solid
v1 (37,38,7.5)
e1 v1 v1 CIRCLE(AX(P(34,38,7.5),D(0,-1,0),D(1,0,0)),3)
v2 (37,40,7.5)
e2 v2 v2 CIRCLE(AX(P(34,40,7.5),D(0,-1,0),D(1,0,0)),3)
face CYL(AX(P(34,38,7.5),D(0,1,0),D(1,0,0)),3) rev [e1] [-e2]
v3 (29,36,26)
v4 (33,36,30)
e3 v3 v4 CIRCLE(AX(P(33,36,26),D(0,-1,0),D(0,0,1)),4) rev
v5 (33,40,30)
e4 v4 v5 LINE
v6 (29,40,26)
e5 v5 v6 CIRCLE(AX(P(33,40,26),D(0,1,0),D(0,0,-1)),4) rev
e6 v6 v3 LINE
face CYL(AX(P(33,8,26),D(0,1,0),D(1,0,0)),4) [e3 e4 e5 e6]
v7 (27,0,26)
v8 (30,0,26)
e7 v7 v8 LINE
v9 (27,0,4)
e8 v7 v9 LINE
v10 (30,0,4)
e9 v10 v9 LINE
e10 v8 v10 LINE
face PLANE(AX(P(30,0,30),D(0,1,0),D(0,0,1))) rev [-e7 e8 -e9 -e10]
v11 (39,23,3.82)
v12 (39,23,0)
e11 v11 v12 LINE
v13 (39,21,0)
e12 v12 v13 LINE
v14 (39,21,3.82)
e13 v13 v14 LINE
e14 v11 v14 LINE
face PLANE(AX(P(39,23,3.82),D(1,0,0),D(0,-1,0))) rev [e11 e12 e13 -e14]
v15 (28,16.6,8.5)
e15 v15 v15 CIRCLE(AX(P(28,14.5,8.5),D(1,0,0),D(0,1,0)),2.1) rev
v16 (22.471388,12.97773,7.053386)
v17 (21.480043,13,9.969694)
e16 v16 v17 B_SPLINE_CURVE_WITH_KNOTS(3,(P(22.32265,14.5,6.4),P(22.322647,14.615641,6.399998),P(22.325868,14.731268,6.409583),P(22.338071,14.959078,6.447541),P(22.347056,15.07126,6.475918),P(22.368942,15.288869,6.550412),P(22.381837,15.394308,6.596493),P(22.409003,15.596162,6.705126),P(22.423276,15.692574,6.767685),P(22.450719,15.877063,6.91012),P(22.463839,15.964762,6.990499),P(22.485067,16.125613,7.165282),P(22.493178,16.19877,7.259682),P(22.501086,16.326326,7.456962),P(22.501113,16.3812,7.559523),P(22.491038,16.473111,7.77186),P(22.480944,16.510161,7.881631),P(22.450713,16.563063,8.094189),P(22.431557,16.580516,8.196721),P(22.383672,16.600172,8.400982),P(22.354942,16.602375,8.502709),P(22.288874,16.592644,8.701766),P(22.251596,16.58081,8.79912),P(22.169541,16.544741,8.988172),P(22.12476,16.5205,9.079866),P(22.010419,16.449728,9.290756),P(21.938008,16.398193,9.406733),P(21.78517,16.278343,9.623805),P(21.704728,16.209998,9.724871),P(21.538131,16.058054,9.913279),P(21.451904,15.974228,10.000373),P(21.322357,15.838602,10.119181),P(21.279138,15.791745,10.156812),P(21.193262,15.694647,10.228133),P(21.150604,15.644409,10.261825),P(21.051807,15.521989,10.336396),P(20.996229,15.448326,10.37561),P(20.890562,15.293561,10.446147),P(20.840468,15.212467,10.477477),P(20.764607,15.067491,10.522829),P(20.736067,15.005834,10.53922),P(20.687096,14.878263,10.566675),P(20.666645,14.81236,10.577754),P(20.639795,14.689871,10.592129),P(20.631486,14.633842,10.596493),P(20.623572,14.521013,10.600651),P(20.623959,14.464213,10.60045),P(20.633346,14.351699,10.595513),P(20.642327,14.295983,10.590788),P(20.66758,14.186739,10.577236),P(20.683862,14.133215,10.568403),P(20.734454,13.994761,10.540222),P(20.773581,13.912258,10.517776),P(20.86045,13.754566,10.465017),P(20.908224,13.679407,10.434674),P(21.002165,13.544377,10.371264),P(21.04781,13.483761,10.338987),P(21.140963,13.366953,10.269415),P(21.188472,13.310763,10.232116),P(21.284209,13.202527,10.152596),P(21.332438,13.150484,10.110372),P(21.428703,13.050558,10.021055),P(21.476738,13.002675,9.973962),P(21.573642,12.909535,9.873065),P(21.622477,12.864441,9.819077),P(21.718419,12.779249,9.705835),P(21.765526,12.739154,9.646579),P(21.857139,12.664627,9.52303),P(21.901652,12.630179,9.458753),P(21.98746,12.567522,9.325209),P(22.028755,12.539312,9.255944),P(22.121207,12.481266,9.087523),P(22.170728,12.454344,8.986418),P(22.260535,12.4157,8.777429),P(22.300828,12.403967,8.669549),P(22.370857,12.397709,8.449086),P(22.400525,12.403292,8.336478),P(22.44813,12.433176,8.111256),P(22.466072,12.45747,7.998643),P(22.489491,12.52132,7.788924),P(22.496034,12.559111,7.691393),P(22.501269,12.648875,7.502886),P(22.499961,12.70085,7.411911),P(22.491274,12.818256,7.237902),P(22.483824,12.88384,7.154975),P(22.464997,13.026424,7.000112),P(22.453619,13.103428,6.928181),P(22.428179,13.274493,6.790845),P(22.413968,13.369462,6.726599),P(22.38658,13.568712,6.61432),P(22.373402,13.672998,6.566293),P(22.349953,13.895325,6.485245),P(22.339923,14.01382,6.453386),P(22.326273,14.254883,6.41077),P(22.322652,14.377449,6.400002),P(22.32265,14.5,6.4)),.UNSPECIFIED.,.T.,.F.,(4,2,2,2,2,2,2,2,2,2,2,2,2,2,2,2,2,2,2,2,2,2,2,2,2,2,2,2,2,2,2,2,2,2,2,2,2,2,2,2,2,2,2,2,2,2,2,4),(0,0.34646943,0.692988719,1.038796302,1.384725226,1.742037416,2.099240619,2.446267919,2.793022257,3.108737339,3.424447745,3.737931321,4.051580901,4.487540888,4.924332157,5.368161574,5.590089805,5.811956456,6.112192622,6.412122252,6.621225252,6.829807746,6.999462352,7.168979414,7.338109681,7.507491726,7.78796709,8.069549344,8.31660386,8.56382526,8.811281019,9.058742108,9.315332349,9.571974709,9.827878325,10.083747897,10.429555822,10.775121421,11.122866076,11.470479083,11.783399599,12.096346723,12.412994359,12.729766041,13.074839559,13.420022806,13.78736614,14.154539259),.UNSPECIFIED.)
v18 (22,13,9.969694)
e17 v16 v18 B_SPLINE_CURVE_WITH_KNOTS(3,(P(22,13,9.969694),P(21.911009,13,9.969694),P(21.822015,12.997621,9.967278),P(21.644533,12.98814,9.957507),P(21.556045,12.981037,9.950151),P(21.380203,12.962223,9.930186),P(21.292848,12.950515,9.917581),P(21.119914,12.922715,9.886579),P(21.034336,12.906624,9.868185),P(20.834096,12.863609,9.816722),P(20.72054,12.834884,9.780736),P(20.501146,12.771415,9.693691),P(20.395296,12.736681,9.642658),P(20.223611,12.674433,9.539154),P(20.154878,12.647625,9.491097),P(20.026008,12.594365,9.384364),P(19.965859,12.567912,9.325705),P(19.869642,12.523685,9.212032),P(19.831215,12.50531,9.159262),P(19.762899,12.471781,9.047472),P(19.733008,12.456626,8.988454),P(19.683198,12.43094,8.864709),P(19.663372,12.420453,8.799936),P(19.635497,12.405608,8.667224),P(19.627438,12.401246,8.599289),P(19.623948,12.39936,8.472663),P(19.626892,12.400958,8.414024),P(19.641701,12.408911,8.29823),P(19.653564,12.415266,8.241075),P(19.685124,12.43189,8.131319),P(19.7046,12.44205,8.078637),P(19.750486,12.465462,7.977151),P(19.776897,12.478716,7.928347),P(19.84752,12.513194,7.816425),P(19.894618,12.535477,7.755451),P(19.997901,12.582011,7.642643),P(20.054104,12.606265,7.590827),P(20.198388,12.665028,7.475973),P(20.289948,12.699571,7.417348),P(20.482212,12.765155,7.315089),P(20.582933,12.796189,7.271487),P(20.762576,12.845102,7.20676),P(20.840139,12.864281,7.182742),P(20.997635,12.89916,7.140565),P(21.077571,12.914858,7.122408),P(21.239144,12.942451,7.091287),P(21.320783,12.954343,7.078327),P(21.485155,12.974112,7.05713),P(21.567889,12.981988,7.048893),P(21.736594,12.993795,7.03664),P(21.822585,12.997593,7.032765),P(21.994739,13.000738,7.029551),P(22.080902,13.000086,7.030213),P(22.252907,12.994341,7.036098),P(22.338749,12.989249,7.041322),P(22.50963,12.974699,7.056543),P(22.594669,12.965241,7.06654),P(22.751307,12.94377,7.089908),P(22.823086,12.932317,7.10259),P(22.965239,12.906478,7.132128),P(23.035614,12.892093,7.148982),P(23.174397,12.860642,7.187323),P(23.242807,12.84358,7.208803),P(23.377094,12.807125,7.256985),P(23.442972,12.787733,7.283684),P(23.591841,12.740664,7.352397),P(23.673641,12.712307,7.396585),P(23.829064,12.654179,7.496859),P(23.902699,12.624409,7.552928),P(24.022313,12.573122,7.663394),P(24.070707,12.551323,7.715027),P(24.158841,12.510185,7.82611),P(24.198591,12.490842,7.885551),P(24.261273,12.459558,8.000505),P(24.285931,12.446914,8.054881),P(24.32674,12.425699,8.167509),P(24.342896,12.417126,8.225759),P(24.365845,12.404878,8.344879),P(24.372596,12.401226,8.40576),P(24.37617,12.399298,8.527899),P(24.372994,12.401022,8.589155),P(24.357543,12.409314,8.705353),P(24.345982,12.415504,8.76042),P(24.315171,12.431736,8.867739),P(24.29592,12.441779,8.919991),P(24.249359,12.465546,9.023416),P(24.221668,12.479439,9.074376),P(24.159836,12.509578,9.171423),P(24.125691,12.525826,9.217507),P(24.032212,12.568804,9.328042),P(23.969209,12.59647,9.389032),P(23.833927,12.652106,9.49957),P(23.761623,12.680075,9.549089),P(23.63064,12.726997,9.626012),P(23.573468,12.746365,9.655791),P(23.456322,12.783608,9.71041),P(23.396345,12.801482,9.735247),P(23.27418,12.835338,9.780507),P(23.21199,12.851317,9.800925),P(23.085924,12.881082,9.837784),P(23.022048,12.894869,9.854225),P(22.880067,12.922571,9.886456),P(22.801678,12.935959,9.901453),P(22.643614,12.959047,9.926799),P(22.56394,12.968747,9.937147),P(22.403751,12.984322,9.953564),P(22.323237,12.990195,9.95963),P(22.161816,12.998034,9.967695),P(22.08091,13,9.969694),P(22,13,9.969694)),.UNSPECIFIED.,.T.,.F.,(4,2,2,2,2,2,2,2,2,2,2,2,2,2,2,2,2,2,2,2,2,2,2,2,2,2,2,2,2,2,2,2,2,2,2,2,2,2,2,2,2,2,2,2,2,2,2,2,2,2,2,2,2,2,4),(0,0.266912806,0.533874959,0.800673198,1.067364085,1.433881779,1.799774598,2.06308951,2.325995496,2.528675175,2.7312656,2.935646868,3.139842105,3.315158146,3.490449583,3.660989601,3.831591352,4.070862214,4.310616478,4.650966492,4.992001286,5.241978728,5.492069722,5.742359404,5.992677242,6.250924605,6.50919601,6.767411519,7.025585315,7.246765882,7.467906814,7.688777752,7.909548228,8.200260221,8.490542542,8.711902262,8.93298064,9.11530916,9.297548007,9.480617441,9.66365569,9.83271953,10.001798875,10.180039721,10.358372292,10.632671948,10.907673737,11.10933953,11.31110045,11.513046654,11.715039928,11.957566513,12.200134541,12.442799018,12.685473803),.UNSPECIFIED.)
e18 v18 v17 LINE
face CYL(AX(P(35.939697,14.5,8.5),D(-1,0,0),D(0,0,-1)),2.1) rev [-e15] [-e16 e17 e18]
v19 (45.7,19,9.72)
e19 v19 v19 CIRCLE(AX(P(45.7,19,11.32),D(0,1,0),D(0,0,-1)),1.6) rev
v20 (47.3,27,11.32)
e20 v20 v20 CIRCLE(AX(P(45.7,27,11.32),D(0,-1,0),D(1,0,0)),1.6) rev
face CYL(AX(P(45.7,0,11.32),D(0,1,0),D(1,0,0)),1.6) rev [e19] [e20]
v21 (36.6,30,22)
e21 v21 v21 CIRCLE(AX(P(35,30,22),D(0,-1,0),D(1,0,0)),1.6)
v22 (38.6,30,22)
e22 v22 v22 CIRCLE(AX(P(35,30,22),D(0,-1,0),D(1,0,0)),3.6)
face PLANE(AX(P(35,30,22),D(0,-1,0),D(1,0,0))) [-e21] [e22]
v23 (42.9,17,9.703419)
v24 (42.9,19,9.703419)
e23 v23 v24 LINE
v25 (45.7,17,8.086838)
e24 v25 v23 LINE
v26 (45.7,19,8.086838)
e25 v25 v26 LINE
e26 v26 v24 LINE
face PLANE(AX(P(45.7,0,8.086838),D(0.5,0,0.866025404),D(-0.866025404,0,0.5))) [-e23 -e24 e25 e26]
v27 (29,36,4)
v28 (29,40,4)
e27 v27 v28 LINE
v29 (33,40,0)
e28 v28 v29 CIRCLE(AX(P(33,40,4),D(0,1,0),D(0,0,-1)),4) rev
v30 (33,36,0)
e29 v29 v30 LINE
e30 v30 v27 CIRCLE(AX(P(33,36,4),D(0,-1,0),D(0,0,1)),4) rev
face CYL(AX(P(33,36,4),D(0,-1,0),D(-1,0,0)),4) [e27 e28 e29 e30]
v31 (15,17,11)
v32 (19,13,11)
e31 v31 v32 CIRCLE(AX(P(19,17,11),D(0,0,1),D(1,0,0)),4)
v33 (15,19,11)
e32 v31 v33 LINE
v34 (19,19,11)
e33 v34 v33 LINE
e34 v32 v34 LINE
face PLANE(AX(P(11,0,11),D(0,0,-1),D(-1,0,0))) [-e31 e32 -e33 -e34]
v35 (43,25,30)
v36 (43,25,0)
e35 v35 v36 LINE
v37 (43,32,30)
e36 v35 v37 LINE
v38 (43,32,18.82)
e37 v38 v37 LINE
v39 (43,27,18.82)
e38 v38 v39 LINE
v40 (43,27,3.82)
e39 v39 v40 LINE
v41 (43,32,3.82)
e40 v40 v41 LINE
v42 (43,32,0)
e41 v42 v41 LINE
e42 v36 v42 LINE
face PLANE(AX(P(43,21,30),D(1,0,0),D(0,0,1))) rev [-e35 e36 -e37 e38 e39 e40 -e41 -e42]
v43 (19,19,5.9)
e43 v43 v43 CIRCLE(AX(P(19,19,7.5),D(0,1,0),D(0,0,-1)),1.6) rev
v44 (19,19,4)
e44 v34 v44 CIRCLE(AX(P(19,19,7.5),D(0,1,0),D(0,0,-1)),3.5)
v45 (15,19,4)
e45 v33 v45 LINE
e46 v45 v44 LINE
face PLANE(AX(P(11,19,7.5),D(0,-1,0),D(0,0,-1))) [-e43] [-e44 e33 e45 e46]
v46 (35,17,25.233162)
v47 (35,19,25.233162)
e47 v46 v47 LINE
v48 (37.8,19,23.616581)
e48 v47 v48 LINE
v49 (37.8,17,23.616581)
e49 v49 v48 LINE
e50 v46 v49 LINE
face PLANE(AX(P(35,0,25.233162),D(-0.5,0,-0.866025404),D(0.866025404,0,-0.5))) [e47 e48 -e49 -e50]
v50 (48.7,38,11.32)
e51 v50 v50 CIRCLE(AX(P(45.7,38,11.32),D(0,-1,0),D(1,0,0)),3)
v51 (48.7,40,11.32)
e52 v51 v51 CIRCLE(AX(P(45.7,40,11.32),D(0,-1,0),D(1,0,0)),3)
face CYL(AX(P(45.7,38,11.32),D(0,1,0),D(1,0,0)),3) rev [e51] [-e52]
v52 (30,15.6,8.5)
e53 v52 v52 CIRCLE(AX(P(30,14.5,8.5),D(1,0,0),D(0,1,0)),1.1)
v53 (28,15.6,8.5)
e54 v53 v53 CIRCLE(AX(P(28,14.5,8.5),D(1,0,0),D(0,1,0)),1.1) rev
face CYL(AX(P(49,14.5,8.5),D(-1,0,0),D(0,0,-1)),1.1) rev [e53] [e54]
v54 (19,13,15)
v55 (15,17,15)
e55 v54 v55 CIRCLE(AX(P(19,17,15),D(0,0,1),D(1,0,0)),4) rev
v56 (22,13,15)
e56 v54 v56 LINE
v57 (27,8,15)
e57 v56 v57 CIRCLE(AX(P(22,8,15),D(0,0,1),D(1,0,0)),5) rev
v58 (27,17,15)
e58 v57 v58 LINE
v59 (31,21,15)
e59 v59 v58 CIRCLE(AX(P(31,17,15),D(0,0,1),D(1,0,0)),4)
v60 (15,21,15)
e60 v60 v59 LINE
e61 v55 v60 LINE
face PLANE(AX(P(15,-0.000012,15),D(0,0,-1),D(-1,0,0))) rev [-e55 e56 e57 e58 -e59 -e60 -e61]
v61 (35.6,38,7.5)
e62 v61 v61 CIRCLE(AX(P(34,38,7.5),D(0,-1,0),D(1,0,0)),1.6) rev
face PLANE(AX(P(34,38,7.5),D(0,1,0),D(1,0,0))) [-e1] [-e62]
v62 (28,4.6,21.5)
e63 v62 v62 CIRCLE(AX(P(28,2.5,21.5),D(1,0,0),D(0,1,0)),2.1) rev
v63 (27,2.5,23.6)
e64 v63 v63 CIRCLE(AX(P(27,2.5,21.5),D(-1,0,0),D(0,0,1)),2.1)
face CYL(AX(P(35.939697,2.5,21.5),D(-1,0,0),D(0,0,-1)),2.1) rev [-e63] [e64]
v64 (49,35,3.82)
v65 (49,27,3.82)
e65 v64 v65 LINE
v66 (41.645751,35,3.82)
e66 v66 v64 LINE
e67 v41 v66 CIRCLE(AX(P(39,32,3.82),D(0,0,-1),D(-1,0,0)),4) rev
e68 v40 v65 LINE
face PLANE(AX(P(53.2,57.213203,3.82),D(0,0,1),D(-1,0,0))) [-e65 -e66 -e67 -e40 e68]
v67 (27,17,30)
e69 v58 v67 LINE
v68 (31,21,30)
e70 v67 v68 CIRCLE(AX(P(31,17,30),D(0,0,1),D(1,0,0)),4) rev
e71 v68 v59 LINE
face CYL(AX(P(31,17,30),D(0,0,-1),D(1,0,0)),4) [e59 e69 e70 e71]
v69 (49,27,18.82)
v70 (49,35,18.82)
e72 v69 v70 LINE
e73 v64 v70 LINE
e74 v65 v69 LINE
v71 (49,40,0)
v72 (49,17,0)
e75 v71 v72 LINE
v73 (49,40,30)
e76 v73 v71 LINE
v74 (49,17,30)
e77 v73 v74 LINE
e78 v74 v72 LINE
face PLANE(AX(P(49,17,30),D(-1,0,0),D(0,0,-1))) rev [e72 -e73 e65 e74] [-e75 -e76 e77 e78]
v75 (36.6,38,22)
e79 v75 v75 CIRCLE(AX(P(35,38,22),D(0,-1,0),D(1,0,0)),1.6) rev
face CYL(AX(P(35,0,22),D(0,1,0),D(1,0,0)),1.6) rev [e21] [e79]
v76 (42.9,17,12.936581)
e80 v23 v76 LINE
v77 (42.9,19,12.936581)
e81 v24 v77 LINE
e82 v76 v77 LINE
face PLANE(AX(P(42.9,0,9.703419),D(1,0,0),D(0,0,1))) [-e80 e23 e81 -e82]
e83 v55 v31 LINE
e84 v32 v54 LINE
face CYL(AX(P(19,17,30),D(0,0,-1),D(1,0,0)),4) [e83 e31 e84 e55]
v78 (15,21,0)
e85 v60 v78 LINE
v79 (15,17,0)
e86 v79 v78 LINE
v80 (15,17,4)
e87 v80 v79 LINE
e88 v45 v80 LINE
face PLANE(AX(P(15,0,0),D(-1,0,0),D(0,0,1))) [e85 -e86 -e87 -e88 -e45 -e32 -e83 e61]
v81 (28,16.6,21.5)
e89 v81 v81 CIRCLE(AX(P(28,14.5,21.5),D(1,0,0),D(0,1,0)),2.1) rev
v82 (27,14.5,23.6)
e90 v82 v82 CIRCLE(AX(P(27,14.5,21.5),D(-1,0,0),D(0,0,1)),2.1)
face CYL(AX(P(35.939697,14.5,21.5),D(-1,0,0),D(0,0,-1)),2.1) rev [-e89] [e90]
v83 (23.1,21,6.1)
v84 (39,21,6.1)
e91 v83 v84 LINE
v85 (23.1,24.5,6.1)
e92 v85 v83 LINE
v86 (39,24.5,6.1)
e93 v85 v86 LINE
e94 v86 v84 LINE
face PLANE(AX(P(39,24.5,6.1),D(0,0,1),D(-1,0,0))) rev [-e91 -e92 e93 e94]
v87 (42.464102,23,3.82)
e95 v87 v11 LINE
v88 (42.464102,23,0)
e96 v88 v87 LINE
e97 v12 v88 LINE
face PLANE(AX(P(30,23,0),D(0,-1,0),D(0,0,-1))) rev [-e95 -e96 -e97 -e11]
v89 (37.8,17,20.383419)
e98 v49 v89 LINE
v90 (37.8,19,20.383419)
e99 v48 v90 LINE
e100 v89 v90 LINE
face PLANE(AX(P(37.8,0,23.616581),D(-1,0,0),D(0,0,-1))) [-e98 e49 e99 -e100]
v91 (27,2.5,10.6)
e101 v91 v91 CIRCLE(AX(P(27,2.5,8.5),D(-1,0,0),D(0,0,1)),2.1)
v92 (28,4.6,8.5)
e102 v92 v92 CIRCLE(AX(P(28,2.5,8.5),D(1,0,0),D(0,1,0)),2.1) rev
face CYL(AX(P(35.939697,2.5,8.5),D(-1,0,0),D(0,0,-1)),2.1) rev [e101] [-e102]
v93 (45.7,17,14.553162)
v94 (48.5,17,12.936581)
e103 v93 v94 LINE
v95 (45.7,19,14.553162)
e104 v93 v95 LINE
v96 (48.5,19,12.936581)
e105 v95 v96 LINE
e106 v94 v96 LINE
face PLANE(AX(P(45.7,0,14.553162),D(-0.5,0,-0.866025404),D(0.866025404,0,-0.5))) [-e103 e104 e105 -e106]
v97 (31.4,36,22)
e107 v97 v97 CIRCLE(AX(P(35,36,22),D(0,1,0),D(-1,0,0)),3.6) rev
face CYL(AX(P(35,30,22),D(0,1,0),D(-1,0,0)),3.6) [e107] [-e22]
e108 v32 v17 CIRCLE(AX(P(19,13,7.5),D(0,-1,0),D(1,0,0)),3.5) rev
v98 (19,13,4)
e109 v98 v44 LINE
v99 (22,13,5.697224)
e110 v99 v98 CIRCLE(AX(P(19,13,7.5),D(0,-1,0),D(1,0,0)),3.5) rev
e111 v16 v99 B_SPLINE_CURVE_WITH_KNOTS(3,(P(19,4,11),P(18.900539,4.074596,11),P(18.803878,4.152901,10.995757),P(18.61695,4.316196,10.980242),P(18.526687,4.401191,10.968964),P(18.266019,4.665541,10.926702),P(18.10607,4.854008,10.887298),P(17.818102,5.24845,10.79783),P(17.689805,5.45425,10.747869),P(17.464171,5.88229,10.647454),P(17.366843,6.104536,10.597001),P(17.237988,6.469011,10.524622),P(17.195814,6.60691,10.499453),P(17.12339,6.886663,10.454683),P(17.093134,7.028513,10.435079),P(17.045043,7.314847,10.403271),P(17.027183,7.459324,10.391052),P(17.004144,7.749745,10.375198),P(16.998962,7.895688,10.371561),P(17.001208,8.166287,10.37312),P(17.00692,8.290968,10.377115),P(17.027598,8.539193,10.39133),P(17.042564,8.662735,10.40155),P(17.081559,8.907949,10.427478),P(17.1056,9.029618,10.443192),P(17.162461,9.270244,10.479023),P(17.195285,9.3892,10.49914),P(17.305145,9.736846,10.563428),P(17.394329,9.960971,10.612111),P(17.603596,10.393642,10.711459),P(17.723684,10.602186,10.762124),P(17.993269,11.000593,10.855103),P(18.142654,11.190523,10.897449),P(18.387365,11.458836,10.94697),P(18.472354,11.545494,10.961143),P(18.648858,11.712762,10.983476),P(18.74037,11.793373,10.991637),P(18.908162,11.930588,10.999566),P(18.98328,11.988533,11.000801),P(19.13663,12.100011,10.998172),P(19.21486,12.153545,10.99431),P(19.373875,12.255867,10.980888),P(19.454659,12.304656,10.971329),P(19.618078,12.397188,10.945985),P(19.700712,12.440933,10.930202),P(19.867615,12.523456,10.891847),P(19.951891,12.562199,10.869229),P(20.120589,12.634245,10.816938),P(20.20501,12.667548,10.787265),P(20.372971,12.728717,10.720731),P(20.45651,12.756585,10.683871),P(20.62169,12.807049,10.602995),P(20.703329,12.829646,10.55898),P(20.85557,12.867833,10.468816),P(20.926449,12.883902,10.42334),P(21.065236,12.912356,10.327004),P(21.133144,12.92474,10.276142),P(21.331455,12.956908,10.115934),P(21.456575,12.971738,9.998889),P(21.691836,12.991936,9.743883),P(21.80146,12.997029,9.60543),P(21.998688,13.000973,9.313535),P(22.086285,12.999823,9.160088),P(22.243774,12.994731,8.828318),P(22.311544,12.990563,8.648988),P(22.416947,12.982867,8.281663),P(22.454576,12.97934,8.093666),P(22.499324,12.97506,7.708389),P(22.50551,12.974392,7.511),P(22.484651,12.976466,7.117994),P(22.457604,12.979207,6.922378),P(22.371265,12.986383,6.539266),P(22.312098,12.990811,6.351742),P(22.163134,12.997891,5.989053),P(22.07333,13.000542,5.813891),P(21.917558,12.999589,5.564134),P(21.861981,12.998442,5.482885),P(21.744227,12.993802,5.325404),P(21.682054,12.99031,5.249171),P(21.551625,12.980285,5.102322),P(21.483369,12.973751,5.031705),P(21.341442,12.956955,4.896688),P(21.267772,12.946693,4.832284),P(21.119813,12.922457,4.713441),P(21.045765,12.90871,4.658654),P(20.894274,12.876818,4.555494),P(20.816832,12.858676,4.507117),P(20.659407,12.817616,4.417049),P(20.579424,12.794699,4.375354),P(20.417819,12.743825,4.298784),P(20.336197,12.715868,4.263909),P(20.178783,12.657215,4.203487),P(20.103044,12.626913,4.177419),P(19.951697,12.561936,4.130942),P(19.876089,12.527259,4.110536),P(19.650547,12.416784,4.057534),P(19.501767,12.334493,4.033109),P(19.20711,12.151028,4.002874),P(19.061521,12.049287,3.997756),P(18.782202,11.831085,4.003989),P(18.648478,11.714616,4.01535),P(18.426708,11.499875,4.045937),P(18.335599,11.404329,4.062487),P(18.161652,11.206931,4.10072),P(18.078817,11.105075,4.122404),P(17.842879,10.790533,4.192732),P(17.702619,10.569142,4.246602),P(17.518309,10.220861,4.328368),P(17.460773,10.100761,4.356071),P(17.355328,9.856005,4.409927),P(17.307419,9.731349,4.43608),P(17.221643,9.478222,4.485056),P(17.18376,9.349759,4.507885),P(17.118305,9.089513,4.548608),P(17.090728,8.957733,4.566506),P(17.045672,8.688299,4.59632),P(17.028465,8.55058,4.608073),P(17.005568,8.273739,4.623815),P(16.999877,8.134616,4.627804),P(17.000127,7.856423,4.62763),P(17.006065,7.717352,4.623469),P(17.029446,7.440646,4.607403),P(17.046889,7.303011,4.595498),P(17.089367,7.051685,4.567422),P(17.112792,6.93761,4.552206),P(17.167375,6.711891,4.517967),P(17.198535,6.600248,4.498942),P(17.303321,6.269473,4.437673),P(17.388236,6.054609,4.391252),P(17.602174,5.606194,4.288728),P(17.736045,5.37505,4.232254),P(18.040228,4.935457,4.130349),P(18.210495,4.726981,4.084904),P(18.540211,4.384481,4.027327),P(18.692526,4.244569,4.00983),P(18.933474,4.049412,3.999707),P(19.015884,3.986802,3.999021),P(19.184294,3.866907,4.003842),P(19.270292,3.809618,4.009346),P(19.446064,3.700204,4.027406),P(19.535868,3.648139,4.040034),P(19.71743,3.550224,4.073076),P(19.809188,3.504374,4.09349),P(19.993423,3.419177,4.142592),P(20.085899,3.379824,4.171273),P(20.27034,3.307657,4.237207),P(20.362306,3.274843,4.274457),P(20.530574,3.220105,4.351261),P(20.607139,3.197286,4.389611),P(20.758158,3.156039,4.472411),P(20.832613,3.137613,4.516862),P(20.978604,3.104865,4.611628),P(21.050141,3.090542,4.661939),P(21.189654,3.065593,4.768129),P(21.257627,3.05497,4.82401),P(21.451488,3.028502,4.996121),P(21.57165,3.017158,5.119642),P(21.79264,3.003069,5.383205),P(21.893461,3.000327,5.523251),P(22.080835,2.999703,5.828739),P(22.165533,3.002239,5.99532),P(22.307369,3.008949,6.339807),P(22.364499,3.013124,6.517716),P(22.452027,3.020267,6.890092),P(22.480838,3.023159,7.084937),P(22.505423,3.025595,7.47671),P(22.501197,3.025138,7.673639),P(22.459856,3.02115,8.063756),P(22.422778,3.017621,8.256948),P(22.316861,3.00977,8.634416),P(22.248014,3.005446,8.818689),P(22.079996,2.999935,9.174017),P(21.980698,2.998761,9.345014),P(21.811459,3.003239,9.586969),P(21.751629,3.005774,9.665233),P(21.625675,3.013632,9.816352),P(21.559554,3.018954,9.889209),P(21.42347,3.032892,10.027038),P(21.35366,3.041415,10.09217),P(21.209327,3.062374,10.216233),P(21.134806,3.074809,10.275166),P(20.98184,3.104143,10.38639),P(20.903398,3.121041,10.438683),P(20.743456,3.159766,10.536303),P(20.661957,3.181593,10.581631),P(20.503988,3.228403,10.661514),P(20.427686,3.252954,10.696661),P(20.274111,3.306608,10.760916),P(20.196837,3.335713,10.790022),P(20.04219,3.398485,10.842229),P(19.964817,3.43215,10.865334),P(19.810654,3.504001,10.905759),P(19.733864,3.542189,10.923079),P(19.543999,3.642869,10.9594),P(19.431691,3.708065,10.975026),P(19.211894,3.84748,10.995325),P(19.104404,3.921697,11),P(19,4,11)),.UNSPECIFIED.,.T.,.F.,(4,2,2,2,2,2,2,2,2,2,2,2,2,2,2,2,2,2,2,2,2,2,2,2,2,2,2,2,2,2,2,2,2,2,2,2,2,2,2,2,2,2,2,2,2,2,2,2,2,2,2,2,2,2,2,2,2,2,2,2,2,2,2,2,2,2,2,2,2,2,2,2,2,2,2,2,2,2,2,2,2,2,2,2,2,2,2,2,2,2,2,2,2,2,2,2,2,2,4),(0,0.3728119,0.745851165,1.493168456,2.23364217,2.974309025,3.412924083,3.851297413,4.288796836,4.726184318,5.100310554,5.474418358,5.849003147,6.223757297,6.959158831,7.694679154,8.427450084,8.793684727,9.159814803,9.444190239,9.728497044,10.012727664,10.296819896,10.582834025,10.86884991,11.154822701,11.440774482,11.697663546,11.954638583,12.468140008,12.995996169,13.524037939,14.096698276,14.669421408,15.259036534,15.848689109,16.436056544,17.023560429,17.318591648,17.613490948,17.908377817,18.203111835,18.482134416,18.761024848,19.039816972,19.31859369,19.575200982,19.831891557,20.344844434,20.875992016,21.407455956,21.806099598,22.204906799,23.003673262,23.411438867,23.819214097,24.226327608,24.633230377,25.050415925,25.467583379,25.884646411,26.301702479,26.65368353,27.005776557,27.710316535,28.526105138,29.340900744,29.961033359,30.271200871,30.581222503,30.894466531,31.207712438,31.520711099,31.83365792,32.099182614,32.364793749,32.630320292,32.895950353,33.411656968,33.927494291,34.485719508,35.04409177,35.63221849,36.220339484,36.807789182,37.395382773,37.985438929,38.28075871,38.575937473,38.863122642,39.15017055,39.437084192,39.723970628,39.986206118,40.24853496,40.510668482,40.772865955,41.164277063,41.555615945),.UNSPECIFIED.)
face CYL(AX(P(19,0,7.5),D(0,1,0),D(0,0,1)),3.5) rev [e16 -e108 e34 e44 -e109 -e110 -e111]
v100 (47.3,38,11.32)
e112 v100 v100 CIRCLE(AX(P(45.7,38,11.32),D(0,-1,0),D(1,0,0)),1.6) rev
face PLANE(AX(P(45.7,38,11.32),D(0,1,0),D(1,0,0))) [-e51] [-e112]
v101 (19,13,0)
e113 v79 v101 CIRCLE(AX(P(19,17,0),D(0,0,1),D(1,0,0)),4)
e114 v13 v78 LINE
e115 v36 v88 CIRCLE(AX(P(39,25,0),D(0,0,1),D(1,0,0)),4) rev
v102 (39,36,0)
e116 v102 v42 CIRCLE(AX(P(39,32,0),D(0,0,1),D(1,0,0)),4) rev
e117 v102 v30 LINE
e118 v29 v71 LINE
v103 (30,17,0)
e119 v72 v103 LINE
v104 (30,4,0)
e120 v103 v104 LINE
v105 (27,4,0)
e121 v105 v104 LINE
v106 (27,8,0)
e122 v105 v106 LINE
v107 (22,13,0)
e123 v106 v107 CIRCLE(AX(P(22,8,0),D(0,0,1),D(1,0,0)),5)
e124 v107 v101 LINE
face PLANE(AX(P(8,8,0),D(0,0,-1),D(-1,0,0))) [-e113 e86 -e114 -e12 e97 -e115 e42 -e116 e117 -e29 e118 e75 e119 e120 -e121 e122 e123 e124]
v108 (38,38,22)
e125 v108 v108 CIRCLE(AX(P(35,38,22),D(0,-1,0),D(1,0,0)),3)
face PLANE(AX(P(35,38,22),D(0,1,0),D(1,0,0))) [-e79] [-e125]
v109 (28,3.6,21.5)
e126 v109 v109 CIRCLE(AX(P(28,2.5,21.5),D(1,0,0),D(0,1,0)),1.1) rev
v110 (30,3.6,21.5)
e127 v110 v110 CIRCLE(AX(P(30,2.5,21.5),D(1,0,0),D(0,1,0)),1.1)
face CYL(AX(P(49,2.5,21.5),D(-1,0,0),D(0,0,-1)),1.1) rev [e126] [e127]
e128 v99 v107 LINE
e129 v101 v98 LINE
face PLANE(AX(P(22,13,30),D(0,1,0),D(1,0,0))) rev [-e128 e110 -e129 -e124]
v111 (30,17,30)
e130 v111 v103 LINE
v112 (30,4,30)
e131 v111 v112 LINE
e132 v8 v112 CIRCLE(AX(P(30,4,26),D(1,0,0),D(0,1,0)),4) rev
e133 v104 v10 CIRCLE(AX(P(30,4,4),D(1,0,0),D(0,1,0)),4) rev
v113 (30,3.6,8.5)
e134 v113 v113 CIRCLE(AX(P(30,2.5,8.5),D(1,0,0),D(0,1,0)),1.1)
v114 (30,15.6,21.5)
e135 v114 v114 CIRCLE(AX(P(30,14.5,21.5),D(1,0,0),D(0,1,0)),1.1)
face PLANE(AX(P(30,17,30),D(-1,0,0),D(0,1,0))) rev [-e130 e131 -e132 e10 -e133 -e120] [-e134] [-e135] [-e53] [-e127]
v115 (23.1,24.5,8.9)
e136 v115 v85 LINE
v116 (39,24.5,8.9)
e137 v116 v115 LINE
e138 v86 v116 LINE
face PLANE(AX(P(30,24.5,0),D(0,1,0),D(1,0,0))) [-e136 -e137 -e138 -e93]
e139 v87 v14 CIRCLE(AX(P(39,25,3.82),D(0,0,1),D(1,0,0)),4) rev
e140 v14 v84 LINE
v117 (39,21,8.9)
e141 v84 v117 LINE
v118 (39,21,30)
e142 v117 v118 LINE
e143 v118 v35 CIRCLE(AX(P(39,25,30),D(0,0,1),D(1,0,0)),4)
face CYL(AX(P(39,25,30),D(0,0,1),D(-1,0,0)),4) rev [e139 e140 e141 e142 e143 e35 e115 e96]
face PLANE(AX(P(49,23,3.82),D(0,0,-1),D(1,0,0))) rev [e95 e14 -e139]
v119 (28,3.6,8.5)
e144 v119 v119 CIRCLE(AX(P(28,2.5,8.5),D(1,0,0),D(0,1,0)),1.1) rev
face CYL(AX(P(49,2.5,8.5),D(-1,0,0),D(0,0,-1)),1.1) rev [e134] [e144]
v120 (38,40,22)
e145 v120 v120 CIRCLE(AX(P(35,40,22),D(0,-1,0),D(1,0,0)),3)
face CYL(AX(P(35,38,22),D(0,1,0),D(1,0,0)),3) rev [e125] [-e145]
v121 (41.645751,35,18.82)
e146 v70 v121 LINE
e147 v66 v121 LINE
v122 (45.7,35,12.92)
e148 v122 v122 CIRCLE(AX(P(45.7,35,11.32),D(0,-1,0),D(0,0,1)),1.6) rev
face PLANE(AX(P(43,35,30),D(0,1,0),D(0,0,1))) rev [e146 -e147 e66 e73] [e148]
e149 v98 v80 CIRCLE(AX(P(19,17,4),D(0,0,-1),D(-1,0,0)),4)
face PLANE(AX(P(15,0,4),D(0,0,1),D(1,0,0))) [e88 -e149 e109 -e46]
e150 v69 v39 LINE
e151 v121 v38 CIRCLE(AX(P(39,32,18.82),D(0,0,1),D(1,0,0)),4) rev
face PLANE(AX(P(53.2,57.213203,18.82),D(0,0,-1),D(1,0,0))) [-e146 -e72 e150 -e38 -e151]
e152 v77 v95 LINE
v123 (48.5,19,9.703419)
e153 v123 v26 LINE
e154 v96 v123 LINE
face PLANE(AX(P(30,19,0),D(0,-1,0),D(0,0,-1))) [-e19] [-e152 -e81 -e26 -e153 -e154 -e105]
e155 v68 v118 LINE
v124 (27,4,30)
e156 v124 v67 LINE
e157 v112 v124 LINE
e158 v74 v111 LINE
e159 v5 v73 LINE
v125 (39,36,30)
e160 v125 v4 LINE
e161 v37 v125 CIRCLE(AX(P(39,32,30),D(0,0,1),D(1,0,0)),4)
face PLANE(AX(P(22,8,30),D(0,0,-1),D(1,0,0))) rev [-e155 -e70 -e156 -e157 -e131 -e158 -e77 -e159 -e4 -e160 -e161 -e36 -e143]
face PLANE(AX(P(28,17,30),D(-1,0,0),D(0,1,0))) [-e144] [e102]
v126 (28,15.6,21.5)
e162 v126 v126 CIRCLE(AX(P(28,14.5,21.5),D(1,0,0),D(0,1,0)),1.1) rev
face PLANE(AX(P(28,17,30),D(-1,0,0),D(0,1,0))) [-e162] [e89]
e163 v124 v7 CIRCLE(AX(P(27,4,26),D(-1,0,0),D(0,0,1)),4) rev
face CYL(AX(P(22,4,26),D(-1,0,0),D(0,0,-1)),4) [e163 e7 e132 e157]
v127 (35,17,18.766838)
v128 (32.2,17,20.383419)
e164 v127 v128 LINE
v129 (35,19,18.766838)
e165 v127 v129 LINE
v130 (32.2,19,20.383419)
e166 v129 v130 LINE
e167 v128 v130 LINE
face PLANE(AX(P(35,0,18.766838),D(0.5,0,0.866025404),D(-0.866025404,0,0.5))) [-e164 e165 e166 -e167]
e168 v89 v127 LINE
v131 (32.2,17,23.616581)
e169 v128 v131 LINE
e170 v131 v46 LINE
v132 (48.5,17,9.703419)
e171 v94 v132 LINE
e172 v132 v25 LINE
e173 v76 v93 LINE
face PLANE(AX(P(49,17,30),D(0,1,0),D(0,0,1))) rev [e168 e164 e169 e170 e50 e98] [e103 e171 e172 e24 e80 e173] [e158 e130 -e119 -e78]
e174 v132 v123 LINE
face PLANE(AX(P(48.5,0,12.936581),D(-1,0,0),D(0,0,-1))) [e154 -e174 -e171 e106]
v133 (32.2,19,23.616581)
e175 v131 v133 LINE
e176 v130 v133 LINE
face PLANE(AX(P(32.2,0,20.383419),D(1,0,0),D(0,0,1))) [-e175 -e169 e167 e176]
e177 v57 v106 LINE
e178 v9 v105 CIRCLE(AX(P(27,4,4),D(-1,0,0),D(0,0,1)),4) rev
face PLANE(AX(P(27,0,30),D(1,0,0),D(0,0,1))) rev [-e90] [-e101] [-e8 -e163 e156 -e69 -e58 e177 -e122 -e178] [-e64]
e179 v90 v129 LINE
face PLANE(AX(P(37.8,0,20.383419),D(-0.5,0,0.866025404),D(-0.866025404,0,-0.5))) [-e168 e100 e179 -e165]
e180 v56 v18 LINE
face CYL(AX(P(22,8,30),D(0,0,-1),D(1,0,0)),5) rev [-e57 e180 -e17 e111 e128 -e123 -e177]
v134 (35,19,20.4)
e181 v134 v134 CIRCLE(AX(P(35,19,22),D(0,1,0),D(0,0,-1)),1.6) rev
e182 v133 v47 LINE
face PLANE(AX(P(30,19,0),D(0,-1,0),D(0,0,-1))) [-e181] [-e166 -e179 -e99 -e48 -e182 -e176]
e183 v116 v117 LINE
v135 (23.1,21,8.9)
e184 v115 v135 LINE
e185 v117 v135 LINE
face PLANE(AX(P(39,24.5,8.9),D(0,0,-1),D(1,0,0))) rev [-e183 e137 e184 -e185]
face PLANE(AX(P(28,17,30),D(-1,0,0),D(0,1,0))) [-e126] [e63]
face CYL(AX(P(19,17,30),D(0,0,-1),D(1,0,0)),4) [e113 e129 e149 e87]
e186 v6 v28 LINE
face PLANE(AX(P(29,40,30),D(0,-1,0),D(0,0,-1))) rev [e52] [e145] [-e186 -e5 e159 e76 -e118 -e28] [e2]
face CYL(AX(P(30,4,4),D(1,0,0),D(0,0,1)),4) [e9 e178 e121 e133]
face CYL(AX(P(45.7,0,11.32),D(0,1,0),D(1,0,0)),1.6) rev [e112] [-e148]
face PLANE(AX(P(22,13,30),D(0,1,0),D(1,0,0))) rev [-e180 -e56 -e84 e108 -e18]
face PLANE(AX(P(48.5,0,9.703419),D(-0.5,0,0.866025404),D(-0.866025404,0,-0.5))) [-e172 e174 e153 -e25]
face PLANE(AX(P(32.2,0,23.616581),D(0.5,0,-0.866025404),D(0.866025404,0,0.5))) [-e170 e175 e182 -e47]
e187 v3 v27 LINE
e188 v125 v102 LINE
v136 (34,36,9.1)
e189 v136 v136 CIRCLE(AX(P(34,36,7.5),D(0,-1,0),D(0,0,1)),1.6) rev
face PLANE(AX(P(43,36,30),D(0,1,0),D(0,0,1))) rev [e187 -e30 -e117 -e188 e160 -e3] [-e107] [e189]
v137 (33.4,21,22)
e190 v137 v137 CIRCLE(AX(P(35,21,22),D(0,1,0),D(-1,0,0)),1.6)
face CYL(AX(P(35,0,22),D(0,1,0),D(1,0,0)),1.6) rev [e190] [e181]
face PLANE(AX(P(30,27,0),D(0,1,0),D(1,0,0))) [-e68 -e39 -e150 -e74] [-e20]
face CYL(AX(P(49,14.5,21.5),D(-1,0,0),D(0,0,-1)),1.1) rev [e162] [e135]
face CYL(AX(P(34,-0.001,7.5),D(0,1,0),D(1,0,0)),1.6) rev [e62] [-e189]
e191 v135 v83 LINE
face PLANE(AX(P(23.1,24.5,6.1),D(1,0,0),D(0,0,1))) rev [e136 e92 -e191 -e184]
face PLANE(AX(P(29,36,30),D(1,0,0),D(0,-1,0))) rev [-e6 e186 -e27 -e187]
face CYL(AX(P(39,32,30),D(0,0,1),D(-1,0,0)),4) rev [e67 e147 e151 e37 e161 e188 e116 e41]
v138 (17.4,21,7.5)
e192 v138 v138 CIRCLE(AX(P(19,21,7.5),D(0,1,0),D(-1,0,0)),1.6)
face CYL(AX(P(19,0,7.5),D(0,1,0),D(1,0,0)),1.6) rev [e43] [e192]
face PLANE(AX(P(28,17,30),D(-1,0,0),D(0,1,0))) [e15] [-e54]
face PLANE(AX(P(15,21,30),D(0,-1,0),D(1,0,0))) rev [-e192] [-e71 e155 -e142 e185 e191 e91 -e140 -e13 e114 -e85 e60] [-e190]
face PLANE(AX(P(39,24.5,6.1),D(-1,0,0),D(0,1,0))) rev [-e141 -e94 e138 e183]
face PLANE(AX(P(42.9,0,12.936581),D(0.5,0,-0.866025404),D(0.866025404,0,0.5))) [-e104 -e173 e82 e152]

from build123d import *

# Parameters (mm, degrees)
RESSALTO_EXTRUS_O1_DEPTH    = 30
CORTE_EXTRUS_O1_DEPTH       = 54.488316481
CORTE_EXTRUS_O1_DEPTH_BACK  = 54.488316481
ESBO_O3_R                   = 1.1
CORTE_EXTRUS_O6_DEPTH       = 54.488316481
CORTE_EXTRUS_O6_DEPTH_BACK  = 54.488316481
ESBO_O4_W                   = 12
ESBO_O4_H                   = 15
ESBO_O5_R                   = 1.6
CORTE_EXTRUS_O7_DEPTH       = 54.488316481
CORTE_EXTRUS_O9_START       = 6
ESBO_O7_W                   = 15
ESBO_O7_H                   = 15
CORTE_EXTRUS_O9_DEPTH       = 8
CORTE_EXTRUS_O11_REACH      = 55.488
ESBO_O9_R                   = 1.6
ESBO_O8_R                   = 3
CORTE_EXTRUS_O10_DEPTH      = 2
CORTE_EXTRUS_O14_DEPTH      = 43.308391603
CORTE_EXTRUS_O14_DEPTH_BACK = 2
CORTE_EXTRUS_O16_DEPTH      = 55.626001135
CORTE_EXTRUS_O16_DEPTH_BACK = 1
ESBO_O15_R                  = 2.1
FILETE1_R                   = 4
ESBO_O16_W                  = 10
ESBO_O16_H                  = 3.82
RESSALTO_EXTRUS_O2_DEPTH    = 2
ESBO_O17_W                  = 15.9
ESBO_O17_H                  = 2.8
RESSALTO_EXTRUS_O3_DEPTH    = 3.5
ESBO_O18_W                  = 52.248887689
ESBO_O18_H                  = 54.313207189
CORTE_EXTRUS_O17_DEPTH      = 34
ESBO_O19_R                  = 3.6
ESBO_O19_R_2                = 1.6
RESSALTO_EXTRUS_O4_DEPTH    = 6


with BuildPart() as part:
    # Esboço1 → Ressalto-extrusão1 (new body)
    with BuildSketch(Plane.XY):
        with BuildLine():
            Line((0, 0), (3, 0))
            Line((3, 0), (3, 8))
            ThreePointArc((3, 8), (4.464466094, 11.535533906), (8, 13))
            Line((8, 13), (15, 13))
            Line((15, 13), (15, 21))
            Line((15, 21), (-13, 21))
            Line((-13, 21), (-13, 36))
            Line((-13, 36), (1, 36))
            Line((1, 36), (1, 40))
            Line((1, 40), (-19, 40))
            Line((-19, 40), (-19, 17))
            Line((-19, 17), (0, 17))
            Line((0, 17), (0, 0))
        make_face()
    extrude(amount=RESSALTO_EXTRUS_O1_DEPTH)

    # Esboço3 → Corte-extrusão1 (cut, two sides: drawn at the far end of the back side and taken through both)
    with BuildSketch(Plane(origin=(0, 0, 0), x_dir=(0, 0, -1), z_dir=(1, 0, 0)).offset(-CORTE_EXTRUS_O1_DEPTH_BACK)):
        with Locations((-8.5, 14.5)):
            Circle(ESBO_O3_R)
        with Locations(Location((-21.5, 14.5, 0), (0, 0, 90))):
            Circle(ESBO_O3_R)
        with Locations(Location((-8.5, 2.5, 0), (0, 0, 90))):
            Circle(ESBO_O3_R)
        with Locations(Location((-21.5, 2.5, 0), (0, 0, 90))):
            Circle(ESBO_O3_R)
    extrude(amount=CORTE_EXTRUS_O1_DEPTH + CORTE_EXTRUS_O1_DEPTH_BACK, mode=Mode.SUBTRACT)

    # Esboço4 → Corte-extrusão6 (cut, two sides: drawn at the far end of the back side and taken through both)
    with BuildSketch(Plane(origin=(0, 0, 0), x_dir=(1, 0, 0), z_dir=(0, 1, 0)).offset(-CORTE_EXTRUS_O6_DEPTH_BACK)):
        with Locations((9, -22.5)):
            Rectangle(ESBO_O4_W, ESBO_O4_H)
    extrude(amount=CORTE_EXTRUS_O6_DEPTH + CORTE_EXTRUS_O6_DEPTH_BACK, mode=Mode.SUBTRACT)

    # Esboço5 → Corte-extrusão7 (cut, through all)
    with BuildSketch(Plane(origin=(0, 40, 0), x_dir=(1, 0, 0), z_dir=(0, 1, 0))):
        with Locations(Location((-5, -22, 0), (0, 0, 270))):
            Circle(ESBO_O5_R)
        with Locations(Location((-15.7, -11.32, 0), (0, 0, 180))):
            Circle(ESBO_O5_R)
        with Locations(Location((11, -7.5, 0), (0, 0, 180))):
            Circle(ESBO_O5_R)
    extrude(amount=-CORTE_EXTRUS_O7_DEPTH, mode=Mode.SUBTRACT)

    # Esboço7 → Corte-extrusão9 (cut)
    with BuildSketch(Plane(origin=(0, 21, 0), x_dir=(1, 0, 0), z_dir=(0, 1, 0)).offset(CORTE_EXTRUS_O9_START)):
        with Locations((-15.7, -11.32)):
            Rectangle(ESBO_O7_W, ESBO_O7_H)
    extrude(amount=CORTE_EXTRUS_O9_DEPTH, mode=Mode.SUBTRACT)

    # Esboço9 → Corte-extrusão11 (cut, up to next)
    with BuildSketch(Plane(origin=(0, 40, 0), x_dir=(1, 0, 0), z_dir=(0, 1, 0)), mode=Mode.PRIVATE) as corte_extrus_o11_sk1:
        with Locations(Location((-4, -7.5, 0), (0, 0, 180))):
            Circle(ESBO_O9_R)
    corte_extrus_o11_tool1 = extrude(corte_extrus_o11_sk1.sketch, amount=-CORTE_EXTRUS_O11_REACH, mode=Mode.PRIVATE) & part.part
    add(corte_extrus_o11_tool1.solids().sort_by_distance((-4, 40, 7.5))[0], mode=Mode.SUBTRACT)

    # Esboço8 → Corte-extrusão10 (cut)
    with BuildSketch(Plane(origin=(0, 40, 0), x_dir=(1, 0, 0), z_dir=(0, 1, 0))):
        with Locations(Location((-15.7, -11.32, 0), (0, 0, 180))):
            Circle(ESBO_O8_R)
        with Locations(Location((-5, -22, 0), (0, 0, 180))):
            Circle(ESBO_O8_R)
        with Locations(Location((-4, -7.5, 0), (0, 0, 180))):
            Circle(ESBO_O8_R)
    extrude(amount=-CORTE_EXTRUS_O10_DEPTH, mode=Mode.SUBTRACT)

    # Esboço14 → Corte-extrusão14 (cut, two sides: drawn at the far end of the back side and taken through both)
    with BuildSketch(Plane.XZ.offset(-17).offset(-CORTE_EXTRUS_O14_DEPTH_BACK)):
        with BuildLine():
            Line((11, 11), (15, 11))
            Line((15, 11), (15, 4))
            Line((15, 4), (11, 4))
            ThreePointArc((11, 4), (7.5, 7.5), (11, 11))
        make_face()
        Polygon((-5, 25.233161507), (-7.8, 23.616580754), (-7.8, 20.383419246), (-5, 18.766838493), (-2.2, 20.383419246), (-2.2, 23.616580754), align=None)
        Polygon((-15.7, 14.553161507), (-18.5, 12.936580754), (-18.5, 9.703419246), (-15.7, 8.086838493), (-12.9, 9.703419246), (-12.9, 12.936580754), align=None)
    extrude(amount=CORTE_EXTRUS_O14_DEPTH + CORTE_EXTRUS_O14_DEPTH_BACK, mode=Mode.SUBTRACT)

    # Esboço15 → Corte-extrusão16 (cut, two sides: drawn at the far end of the back side and taken through both)
    with BuildSketch(Plane(origin=(3, 0, 0), x_dir=(0, 0, -1), z_dir=(1, 0, 0)).offset(-CORTE_EXTRUS_O16_DEPTH_BACK)):
        with Locations(Location((-21.5, 14.5, 0), (0, 0, 90))):
            Circle(ESBO_O15_R)
        with Locations(Location((-8.5, 14.5, 0), (0, 0, 313.540252108))):
            Circle(ESBO_O15_R)
        with Locations(Location((-8.5, 2.5, 0), (0, 0, 90))):
            Circle(ESBO_O15_R)
        with Locations(Location((-21.5, 2.5, 0), (0, 0, 90))):
            Circle(ESBO_O15_R)
    extrude(amount=CORTE_EXTRUS_O16_DEPTH + CORTE_EXTRUS_O16_DEPTH_BACK, mode=Mode.SUBTRACT)

    # Filete1
    # the kernel refuses this fillet: 4 mm, written as the material it adds along each edge
    with BuildSketch(Plane(origin=(-13, 21, 0), x_dir=(1, 0, 0), z_dir=(0, 0, 1))) as filete1_piece_1:
        with BuildLine():
            CenterArc((FILETE1_R, FILETE1_R), FILETE1_R, 180, 90)
            Line((0, FILETE1_R), (0, 0))
            Line((0, 0), (FILETE1_R, 0))
        make_face()
    extrude(amount=30)
    with BuildSketch(Plane(origin=(-13, 36, 0), x_dir=(1, 0, 0), z_dir=(0, 0, 1))) as filete1_piece_2_section:
        with BuildLine():
            CenterArc((FILETE1_R, -FILETE1_R), FILETE1_R, 90, 90)
            Line((0, -FILETE1_R), (0, 0))
            Line((0, 0), (FILETE1_R, 0))
        make_face()
    filete1_piece_2 = extrude(amount=30, mode=Mode.PRIVATE)
    filete1_piece_2 = split(filete1_piece_2, bisect_by=Plane(origin=(-11.759467995, 35, 1.91), z_dir=(0, 1, 0)), keep=Keep.TOP, mode=Mode.PRIVATE)
    filete1_piece_2 = split(filete1_piece_2, bisect_by=Plane(origin=(-11.759467995, 35.634662641, 3.82), z_dir=(0, 0, -1)), keep=Keep.TOP, mode=Mode.PRIVATE)
    add(filete1_piece_2)
    with BuildSketch(Plane(origin=(-13, 36, 0), x_dir=(1, 0, 0), z_dir=(0, 0, 1))) as filete1_piece_3_section:
        with BuildLine():
            CenterArc((FILETE1_R, -FILETE1_R), FILETE1_R, 90, 90)
            Line((0, -FILETE1_R), (0, 0))
            Line((0, 0), (FILETE1_R, 0))
        make_face()
    filete1_piece_3 = extrude(amount=30, mode=Mode.PRIVATE)
    filete1_piece_3 = split(filete1_piece_3, bisect_by=Plane(origin=(-12.678584174, 35, 1.91), z_dir=(0, -1, 0)), keep=Keep.TOP, mode=Mode.PRIVATE)
    filete1_piece_3 = split(filete1_piece_3, bisect_by=Plane(origin=(-12.678584174, 34.15222085, 3.82), z_dir=(0, 0, -1)), keep=Keep.TOP, mode=Mode.PRIVATE)
    add(filete1_piece_3)
    with BuildSketch(Plane(origin=(-13, 36, 0), x_dir=(1, 0, 0), z_dir=(0, 0, 1))) as filete1_piece_4_section:
        with BuildLine():
            CenterArc((FILETE1_R, -FILETE1_R), FILETE1_R, 90, 90)
            Line((0, -FILETE1_R), (0, 0))
            Line((0, 0), (FILETE1_R, 0))
        make_face()
    filete1_piece_4 = extrude(amount=30, mode=Mode.PRIVATE)
    filete1_piece_4 = split(filete1_piece_4, bisect_by=Plane(origin=(-11.759467995, 35, 11.32), z_dir=(0, 1, 0)), keep=Keep.TOP, mode=Mode.PRIVATE)
    filete1_piece_4 = split(filete1_piece_4, bisect_by=Plane(origin=(-11.759467995, 35.634662641, 3.82), z_dir=(0, 0, 1)), keep=Keep.TOP, mode=Mode.PRIVATE)
    filete1_piece_4 = split(filete1_piece_4, bisect_by=Plane(origin=(-11.759467995, 35.634662641, 18.82), z_dir=(0, 0, -1)), keep=Keep.TOP, mode=Mode.PRIVATE)
    add(filete1_piece_4)
    with BuildSketch(Plane(origin=(-13, 36, 0), x_dir=(1, 0, 0), z_dir=(0, 0, 1))) as filete1_piece_5_section:
        with BuildLine():
            CenterArc((FILETE1_R, -FILETE1_R), FILETE1_R, 90, 90)
            Line((0, -FILETE1_R), (0, 0))
            Line((0, 0), (FILETE1_R, 0))
        make_face()
    filete1_piece_5 = extrude(amount=30, mode=Mode.PRIVATE)
    filete1_piece_5 = split(filete1_piece_5, bisect_by=Plane(origin=(-11.759467995, 35, 24.41), z_dir=(0, 1, 0)), keep=Keep.TOP, mode=Mode.PRIVATE)
    filete1_piece_5 = split(filete1_piece_5, bisect_by=Plane(origin=(-11.759467995, 35.634662641, 18.82), z_dir=(0, 0, 1)), keep=Keep.TOP, mode=Mode.PRIVATE)
    add(filete1_piece_5)
    with BuildSketch(Plane(origin=(-13, 36, 0), x_dir=(1, 0, 0), z_dir=(0, 0, 1))) as filete1_piece_6_section:
        with BuildLine():
            CenterArc((FILETE1_R, -FILETE1_R), FILETE1_R, 90, 90)
            Line((0, -FILETE1_R), (0, 0))
            Line((0, 0), (FILETE1_R, 0))
        make_face()
    filete1_piece_6 = extrude(amount=30, mode=Mode.PRIVATE)
    filete1_piece_6 = split(filete1_piece_6, bisect_by=Plane(origin=(-12.678584174, 35, 24.41), z_dir=(0, -1, 0)), keep=Keep.TOP, mode=Mode.PRIVATE)
    filete1_piece_6 = split(filete1_piece_6, bisect_by=Plane(origin=(-12.678584174, 34.15222085, 18.82), z_dir=(0, 0, 1)), keep=Keep.TOP, mode=Mode.PRIVATE)
    add(filete1_piece_6)
    # the kernel refuses this fillet: 4 mm, written as the material it takes off along each edge
    with BuildSketch(Plane(origin=(-10, 0, 0), x_dir=(0, 0, 1), z_dir=(1, 0, 0))) as filete1_2_piece_1:
        with BuildLine():
            CenterArc((FILETE1_R, -FILETE1_R), FILETE1_R, 90, 90)
            Line((0, -FILETE1_R), (0, 0))
            Line((0, 0), (FILETE1_R, 0))
        make_face()
    extrude(amount=23, mode=Mode.SUBTRACT)
    with BuildSketch(Plane(origin=(-10, 0, 30), x_dir=(0, 0, -1), z_dir=(1, 0, 0))) as filete1_2_piece_2:
        with BuildLine():
            CenterArc((FILETE1_R, FILETE1_R), FILETE1_R, 180, 90)
            Line((0, FILETE1_R), (0, 0))
            Line((0, 0), (FILETE1_R, 0))
        make_face()
    extrude(amount=23, mode=Mode.SUBTRACT)
    with BuildSketch(Plane(origin=(3, 21, 15), x_dir=(-1, 0, 0), z_dir=(0, 0, 1))) as filete1_2_piece_3:
        with BuildLine():
            CenterArc((FILETE1_R, FILETE1_R), FILETE1_R, 180, 90)
            Line((0, FILETE1_R), (0, 0))
            Line((0, 0), (FILETE1_R, 0))
        make_face()
    extrude(amount=25, mode=Mode.SUBTRACT)
    with BuildSketch(Plane(origin=(1, 26, 0), x_dir=(0, 0, 1), z_dir=(0, 1, 0)), Plane(origin=(15, 13, -10), x_dir=(-1, 0, 0), z_dir=(0, 0, 1)), Plane(origin=(15, 13, 1), x_dir=(-1, 0, 0), z_dir=(0, 0, 1))) as filete1_2_piece_4:
        with BuildLine():
            CenterArc((FILETE1_R, -FILETE1_R), FILETE1_R, 90, 90)
            Line((0, -FILETE1_R), (0, 0))
            Line((0, 0), (FILETE1_R, 0))
        make_face()
    extrude(amount=24, mode=Mode.SUBTRACT)
    with BuildSketch(Plane(origin=(1, 26, 30), x_dir=(0, 0, -1), z_dir=(0, 1, 0))) as filete1_2_piece_5:
        with BuildLine():
            CenterArc((FILETE1_R, FILETE1_R), FILETE1_R, 180, 90)
            Line((0, FILETE1_R), (0, 0))
            Line((0, 0), (FILETE1_R, 0))
        make_face()
    extrude(amount=24, mode=Mode.SUBTRACT)

    # Esboço16 → Ressalto-extrusão2 (add)
    with BuildSketch(Plane(origin=(0, 21, 0), x_dir=(1, 0, 0), z_dir=(0, 1, 0))):
        with Locations((-14, -1.91)):
            Rectangle(ESBO_O16_W, ESBO_O16_H)
    extrude(amount=RESSALTO_EXTRUS_O2_DEPTH)

    # Esboço17 → Ressalto-extrusão3 (add)
    with BuildSketch(Plane(origin=(0, 21, 0), x_dir=(1, 0, 0), z_dir=(0, 1, 0))):
        with Locations((-1.05, -7.5)):
            Rectangle(ESBO_O17_W, ESBO_O17_H)
    extrude(amount=RESSALTO_EXTRUS_O3_DEPTH)

    # Espelhar1: part across plane


with BuildPart() as part_1:
    add(part.part)
    add(part.part.mirror(Plane(origin=(15, 21, 30), x_dir=(0, 0, 1), z_dir=(-1, 0, 0))))

    # Esboço18 → Corte-extrusão17 (cut)
    with BuildSketch(Plane.ZY.offset(19)):
        with Locations((14.699236255, 19.293263453)):
            Rectangle(ESBO_O18_W, ESBO_O18_H)
    extrude(amount=-CORTE_EXTRUS_O17_DEPTH, mode=Mode.SUBTRACT)

    # Esboço19 → Ressalto-extrusão4 (add)
    with BuildSketch(Plane.XZ.offset(-36)):
        with Locations(Location((35, 22, 0), (0, 0, 180))):
            Circle(ESBO_O19_R)
        with Locations(Location((35, 22, 0), (0, 0, 270))):
            Circle(ESBO_O19_R_2, mode=Mode.SUBTRACT)
    extrude(amount=RESSALTO_EXTRUS_O4_DEPTH)


solid = part_1.part
